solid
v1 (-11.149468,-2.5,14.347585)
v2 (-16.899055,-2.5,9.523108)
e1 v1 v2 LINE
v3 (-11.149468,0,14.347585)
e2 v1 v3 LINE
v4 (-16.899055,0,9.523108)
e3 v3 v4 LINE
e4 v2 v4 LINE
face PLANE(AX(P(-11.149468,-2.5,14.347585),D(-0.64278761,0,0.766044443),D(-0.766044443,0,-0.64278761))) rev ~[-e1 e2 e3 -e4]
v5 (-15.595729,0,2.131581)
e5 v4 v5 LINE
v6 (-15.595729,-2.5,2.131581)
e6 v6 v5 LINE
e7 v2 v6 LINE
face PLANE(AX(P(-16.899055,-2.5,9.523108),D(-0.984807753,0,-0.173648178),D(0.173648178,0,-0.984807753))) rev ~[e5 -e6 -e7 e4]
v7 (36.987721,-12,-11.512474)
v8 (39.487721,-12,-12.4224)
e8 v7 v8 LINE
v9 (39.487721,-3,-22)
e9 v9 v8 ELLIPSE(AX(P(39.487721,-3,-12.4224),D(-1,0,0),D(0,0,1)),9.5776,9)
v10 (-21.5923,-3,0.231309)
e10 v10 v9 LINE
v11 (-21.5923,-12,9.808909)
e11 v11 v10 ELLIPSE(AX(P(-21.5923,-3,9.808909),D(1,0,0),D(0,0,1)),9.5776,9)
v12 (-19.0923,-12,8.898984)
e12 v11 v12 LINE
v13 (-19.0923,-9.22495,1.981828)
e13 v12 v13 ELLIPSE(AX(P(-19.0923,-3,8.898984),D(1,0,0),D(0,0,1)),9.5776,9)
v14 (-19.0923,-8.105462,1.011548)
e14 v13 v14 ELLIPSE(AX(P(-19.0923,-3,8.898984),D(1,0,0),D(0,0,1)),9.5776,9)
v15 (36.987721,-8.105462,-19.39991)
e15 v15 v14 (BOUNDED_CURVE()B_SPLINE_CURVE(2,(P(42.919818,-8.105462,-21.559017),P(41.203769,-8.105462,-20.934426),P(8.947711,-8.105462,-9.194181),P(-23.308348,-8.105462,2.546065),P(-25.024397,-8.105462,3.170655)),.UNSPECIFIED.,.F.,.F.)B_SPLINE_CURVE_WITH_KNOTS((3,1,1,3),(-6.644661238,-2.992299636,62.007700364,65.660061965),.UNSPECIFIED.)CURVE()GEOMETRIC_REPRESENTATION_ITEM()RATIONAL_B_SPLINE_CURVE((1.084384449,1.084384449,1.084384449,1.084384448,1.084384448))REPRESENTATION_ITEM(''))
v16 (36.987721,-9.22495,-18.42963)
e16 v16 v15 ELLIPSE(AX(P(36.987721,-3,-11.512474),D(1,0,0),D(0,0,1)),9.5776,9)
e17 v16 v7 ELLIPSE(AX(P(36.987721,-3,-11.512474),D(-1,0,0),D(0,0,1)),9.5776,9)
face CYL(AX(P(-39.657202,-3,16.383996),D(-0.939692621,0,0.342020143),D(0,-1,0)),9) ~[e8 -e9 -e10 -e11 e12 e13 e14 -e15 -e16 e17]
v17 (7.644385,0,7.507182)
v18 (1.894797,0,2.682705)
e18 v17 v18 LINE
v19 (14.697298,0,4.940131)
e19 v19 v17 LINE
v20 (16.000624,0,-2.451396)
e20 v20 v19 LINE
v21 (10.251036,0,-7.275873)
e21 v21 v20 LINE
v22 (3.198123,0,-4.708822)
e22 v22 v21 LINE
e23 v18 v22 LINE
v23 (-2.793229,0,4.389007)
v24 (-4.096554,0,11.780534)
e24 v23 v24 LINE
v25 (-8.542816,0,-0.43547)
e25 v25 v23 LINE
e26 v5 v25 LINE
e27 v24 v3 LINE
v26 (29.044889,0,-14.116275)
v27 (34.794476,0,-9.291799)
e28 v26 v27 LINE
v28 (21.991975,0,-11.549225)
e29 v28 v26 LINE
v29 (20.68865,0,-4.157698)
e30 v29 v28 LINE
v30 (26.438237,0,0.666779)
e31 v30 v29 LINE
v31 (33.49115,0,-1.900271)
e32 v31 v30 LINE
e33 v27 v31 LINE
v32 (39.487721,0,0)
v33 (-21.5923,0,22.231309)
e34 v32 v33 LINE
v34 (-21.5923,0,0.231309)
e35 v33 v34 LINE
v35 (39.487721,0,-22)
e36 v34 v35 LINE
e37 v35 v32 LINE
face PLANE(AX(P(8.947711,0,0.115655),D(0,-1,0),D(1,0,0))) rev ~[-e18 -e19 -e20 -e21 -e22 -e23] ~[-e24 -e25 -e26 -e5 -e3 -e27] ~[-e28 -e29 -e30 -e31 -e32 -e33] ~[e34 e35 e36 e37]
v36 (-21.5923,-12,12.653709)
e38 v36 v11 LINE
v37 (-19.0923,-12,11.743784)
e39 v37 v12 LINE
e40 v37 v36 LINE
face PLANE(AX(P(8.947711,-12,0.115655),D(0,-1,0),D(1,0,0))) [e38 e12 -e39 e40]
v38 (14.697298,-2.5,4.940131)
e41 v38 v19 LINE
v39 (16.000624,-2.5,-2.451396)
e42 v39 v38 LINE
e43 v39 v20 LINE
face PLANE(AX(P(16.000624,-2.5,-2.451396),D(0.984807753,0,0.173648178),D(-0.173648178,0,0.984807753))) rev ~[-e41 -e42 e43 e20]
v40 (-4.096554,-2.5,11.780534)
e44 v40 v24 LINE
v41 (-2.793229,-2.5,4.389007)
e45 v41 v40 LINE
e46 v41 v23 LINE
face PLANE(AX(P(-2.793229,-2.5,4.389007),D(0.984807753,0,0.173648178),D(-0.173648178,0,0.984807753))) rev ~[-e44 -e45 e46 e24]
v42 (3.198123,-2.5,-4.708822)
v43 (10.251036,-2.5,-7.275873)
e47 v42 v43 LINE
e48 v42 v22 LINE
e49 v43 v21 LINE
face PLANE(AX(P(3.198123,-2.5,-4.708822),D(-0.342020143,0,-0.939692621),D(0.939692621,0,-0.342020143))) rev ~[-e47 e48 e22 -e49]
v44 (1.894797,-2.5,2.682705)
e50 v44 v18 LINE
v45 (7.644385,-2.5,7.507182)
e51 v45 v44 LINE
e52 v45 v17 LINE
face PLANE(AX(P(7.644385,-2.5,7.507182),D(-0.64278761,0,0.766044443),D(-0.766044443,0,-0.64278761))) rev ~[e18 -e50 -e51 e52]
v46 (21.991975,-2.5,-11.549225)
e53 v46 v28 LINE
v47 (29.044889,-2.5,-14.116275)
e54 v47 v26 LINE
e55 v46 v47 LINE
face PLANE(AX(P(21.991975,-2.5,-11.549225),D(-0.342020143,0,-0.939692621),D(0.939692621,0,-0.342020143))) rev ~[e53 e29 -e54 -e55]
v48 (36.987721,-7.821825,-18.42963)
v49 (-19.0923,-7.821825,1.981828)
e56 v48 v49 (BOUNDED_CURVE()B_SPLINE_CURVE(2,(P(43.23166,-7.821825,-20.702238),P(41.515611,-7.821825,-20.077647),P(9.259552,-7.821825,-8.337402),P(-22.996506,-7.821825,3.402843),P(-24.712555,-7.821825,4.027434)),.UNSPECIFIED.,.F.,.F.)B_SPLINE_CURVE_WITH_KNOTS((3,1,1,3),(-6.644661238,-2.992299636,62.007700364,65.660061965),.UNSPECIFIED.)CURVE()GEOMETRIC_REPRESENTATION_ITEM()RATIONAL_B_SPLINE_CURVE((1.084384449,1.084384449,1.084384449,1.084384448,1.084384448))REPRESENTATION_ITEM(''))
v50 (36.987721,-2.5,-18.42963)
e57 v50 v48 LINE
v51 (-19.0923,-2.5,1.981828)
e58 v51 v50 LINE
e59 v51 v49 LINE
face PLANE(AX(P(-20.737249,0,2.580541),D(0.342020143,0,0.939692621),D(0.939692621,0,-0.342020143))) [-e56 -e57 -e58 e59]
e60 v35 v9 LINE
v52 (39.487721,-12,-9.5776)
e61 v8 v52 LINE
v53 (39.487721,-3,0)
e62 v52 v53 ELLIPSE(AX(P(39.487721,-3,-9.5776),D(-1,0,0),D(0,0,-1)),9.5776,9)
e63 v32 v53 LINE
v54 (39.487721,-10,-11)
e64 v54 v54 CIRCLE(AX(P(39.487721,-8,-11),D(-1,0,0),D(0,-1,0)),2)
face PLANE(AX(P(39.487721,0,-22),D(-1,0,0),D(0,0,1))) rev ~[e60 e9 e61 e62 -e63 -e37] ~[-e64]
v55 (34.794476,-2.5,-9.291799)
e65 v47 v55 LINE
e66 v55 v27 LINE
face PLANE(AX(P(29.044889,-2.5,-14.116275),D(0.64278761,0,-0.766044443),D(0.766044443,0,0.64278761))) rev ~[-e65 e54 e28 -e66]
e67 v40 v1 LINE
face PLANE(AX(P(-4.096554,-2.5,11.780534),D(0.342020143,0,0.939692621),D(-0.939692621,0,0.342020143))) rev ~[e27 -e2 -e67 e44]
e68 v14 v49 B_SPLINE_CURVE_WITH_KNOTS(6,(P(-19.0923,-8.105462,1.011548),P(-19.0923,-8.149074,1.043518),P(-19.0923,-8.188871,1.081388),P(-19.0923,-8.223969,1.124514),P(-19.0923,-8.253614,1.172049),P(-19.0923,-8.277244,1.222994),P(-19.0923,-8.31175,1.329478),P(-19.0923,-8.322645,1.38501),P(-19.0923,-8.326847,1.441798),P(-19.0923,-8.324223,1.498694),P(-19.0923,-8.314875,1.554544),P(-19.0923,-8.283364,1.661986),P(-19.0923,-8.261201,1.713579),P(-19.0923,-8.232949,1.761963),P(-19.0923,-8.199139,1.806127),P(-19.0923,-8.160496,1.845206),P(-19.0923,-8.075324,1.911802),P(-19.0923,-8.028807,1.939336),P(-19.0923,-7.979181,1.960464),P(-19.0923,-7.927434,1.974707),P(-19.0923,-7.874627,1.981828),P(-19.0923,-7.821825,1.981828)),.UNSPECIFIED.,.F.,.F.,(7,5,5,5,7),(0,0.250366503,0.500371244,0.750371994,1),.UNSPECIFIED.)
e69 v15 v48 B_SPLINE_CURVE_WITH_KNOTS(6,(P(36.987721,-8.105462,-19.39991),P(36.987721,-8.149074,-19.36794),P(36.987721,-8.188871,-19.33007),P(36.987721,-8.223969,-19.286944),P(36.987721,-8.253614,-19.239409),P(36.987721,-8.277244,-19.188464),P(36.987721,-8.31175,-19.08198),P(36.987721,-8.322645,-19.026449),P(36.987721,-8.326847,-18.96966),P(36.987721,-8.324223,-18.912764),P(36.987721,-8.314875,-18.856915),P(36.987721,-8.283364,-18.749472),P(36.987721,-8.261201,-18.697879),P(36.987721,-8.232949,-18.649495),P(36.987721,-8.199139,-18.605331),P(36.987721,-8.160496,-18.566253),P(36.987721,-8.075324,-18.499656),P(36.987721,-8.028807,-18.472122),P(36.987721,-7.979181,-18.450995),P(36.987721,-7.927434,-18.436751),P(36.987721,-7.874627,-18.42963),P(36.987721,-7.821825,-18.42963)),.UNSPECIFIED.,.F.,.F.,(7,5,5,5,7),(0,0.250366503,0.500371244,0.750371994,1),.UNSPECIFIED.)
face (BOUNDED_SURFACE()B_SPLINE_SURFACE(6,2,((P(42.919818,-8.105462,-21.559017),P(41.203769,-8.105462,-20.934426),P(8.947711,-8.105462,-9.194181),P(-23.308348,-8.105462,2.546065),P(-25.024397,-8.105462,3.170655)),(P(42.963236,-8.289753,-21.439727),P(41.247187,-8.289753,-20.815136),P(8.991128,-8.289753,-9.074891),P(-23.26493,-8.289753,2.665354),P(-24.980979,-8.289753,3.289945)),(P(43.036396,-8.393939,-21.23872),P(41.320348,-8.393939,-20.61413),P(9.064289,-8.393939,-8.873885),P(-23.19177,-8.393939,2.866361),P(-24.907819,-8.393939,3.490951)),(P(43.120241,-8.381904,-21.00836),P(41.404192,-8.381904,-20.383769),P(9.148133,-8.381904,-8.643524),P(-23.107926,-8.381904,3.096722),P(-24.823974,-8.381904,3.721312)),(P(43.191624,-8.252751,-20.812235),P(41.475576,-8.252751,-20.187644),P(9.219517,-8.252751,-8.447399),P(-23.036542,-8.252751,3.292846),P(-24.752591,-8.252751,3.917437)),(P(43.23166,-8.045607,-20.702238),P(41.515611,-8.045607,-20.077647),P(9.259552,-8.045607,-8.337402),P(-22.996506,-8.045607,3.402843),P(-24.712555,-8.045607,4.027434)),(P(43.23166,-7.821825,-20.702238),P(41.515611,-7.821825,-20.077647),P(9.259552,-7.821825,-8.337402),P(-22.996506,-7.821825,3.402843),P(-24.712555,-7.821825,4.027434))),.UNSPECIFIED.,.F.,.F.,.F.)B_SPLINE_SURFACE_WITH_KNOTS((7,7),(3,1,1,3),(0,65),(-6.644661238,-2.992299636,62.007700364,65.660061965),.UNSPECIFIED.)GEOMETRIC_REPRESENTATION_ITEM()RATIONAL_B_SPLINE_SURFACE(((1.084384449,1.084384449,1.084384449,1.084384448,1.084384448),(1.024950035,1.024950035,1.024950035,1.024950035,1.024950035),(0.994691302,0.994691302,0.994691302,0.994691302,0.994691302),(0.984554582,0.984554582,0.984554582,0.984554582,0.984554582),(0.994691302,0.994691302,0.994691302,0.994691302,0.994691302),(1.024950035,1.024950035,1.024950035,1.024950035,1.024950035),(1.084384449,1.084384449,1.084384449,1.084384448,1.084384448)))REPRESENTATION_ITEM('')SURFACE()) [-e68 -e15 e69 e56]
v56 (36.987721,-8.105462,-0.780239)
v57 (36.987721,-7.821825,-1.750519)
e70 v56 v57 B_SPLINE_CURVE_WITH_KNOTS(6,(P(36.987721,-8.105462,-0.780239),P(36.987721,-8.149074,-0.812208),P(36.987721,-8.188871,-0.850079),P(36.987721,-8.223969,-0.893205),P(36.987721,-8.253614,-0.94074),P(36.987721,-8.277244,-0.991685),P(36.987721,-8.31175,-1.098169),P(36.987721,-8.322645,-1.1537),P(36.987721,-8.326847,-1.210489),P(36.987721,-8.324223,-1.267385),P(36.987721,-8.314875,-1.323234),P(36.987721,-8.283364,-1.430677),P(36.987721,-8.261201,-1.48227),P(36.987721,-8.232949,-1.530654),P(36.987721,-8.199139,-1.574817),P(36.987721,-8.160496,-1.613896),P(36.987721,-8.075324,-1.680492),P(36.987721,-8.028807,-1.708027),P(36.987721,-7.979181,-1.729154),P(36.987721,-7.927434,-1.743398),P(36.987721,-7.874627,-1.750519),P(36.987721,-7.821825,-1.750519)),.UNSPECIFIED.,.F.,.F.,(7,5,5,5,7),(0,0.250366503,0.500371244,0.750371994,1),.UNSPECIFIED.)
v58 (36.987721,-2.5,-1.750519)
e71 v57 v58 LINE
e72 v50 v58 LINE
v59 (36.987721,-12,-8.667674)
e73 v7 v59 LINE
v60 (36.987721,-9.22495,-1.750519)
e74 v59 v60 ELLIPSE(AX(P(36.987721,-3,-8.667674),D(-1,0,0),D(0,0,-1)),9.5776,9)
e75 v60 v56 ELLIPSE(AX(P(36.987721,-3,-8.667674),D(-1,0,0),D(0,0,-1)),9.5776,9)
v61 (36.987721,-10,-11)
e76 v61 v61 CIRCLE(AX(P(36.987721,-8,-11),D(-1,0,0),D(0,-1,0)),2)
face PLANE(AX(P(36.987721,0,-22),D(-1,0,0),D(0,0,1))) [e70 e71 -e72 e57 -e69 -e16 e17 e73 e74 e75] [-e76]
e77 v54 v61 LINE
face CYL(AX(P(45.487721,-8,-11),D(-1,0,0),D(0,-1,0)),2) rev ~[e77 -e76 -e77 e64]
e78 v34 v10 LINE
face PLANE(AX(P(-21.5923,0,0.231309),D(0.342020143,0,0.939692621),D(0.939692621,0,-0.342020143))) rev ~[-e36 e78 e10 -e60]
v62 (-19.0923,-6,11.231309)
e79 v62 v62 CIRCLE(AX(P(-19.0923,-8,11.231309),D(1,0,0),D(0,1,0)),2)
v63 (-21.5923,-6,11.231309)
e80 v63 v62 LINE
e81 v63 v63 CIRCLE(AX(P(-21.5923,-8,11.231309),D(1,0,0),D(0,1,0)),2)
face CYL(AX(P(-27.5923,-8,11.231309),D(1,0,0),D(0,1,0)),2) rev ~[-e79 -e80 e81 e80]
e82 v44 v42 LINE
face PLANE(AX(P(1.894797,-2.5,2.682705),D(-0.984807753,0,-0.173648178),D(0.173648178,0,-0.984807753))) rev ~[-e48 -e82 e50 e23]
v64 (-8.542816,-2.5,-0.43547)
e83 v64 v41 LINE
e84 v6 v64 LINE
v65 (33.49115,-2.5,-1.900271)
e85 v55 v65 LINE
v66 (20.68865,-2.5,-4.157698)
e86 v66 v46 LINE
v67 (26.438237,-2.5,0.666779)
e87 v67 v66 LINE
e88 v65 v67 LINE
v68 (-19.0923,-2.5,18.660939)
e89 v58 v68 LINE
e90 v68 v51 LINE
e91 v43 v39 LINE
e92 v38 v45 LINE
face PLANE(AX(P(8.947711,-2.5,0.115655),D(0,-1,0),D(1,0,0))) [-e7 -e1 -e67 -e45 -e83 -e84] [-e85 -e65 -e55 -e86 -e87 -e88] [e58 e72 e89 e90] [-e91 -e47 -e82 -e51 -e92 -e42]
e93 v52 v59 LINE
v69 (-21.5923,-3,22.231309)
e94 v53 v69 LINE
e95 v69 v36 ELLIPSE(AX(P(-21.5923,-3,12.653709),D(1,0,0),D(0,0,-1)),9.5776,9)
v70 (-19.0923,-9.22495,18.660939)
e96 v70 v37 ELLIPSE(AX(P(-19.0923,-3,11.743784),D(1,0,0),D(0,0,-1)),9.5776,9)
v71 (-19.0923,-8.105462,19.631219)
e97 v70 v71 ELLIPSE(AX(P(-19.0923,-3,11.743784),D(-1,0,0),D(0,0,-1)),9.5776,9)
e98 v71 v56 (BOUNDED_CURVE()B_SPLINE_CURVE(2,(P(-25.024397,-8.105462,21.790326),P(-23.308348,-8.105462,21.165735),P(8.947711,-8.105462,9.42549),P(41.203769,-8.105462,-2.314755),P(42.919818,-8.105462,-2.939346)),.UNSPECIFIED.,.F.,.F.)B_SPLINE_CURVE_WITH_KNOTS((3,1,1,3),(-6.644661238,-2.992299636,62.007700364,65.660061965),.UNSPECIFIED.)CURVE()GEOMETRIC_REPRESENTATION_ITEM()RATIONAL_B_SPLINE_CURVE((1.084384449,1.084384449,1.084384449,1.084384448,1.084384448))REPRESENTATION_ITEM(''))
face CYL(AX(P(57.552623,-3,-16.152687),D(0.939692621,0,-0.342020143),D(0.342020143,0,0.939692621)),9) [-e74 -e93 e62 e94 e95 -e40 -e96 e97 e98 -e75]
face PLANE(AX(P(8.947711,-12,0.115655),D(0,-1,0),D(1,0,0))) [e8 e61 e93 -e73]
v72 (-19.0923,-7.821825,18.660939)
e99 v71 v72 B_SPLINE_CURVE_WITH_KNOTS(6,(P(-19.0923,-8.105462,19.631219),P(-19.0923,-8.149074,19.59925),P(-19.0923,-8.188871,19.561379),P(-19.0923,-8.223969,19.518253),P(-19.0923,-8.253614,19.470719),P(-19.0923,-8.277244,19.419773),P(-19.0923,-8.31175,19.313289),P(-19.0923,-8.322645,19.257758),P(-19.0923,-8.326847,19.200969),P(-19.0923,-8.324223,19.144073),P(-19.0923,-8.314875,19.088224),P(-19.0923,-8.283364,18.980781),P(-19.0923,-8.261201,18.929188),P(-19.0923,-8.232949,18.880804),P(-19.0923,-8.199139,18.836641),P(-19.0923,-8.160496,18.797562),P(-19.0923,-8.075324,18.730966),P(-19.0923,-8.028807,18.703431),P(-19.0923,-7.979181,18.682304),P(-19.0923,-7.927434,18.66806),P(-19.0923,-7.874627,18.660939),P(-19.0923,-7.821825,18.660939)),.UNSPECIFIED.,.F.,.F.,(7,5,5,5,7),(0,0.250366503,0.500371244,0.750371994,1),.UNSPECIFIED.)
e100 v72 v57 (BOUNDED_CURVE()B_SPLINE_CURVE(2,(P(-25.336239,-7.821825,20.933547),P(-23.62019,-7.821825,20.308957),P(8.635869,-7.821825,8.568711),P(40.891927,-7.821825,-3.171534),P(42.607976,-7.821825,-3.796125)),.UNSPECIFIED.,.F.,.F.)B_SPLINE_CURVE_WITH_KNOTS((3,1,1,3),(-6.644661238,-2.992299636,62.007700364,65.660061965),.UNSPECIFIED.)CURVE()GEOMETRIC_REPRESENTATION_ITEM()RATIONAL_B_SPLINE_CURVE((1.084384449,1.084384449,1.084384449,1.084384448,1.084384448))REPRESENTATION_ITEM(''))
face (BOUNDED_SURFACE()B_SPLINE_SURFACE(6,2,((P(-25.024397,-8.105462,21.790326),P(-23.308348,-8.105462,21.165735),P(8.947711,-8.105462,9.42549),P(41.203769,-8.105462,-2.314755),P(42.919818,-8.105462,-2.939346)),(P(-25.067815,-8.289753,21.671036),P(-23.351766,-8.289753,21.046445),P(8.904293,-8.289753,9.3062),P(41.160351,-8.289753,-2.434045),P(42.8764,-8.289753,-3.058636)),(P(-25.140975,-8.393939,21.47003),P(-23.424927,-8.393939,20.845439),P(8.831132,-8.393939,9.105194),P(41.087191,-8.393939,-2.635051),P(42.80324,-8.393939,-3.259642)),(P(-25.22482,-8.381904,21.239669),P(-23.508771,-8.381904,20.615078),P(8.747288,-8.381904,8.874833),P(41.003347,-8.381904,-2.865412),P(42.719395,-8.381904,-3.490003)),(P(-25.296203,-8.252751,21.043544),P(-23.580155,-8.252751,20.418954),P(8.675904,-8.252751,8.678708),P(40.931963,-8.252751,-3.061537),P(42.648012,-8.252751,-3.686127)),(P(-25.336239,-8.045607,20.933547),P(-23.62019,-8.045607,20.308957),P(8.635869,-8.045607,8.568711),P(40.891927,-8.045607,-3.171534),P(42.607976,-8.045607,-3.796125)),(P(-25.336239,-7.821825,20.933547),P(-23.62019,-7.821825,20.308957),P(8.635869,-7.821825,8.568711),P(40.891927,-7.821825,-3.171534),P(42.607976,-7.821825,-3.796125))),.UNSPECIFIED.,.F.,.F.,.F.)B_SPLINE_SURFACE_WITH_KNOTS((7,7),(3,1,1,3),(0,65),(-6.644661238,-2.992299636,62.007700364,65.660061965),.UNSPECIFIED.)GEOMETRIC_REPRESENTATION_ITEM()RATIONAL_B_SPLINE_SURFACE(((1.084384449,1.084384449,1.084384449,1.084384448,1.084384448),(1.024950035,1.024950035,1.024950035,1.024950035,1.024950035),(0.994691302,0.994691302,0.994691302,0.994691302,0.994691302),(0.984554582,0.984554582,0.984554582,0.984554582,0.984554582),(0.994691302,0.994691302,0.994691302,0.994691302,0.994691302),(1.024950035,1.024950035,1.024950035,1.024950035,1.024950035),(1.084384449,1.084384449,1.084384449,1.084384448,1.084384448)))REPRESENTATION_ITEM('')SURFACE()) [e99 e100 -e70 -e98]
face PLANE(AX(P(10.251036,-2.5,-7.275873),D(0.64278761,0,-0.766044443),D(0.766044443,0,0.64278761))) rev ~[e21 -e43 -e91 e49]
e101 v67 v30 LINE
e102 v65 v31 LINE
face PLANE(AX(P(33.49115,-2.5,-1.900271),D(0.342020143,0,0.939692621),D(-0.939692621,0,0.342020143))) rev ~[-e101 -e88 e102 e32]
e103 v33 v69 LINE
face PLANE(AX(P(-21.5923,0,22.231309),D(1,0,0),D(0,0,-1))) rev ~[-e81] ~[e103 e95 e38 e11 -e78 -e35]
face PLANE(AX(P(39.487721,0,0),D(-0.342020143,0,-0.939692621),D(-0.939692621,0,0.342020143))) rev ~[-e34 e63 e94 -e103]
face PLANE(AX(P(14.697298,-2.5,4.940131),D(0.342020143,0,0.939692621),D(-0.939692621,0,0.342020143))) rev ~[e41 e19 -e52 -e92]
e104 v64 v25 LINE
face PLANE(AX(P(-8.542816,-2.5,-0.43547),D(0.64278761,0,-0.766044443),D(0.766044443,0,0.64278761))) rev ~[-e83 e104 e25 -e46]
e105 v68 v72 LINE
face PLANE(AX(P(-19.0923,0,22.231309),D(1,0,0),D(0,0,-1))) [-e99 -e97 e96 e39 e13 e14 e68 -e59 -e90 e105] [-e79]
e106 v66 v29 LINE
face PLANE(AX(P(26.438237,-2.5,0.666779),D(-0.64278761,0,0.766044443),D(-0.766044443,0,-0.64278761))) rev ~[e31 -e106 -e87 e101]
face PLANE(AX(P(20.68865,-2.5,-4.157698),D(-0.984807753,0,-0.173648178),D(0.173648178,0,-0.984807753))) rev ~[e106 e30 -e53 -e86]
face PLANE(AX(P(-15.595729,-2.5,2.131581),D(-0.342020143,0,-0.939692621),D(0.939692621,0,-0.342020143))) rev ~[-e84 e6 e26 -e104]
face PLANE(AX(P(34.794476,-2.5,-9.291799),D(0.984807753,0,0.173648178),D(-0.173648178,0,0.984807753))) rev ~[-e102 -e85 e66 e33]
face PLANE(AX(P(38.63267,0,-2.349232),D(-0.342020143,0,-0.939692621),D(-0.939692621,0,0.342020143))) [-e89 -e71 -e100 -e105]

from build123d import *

# Parameters (mm, degrees)
F1_DEPTH    = 12
F2_T        = -2.5
F4_D        = 4
F4_DEPTH    = 6
F4_TIP      = 1.2017212381
F6_D        = 4
F6_DEPTH    = 6
F6_TIP      = 1.2017212381
F7_T1_DEPTH = 110
F7_T3_DEPTH = 110
F9_DEPTH    = 25
F10_R       = 0.5


# Not quite as in the source:
# - a fillet or chamfer that OpenCascade refuses, or shapes differently, is made with other operations: its cross-section is extruded or revolved along the edge and cut away or added


with BuildPart() as f1:
    # F0 (on Front) → F1 (new body)
    with BuildSketch(Plane.XZ):
        Polygon((39.4877206884, 0), (-21.5922996627, 22.2313093162), (-21.5922996627, 0.2313093162), (39.4877206884, -22), align=None)
    extrude(amount=F1_DEPTH)

    # F2
    f2_openings = [f1.faces().sort_by_distance(p)[0] for p in [
        (8.947711, -12, 0.115655),
    ]]
    offset(amount=F2_T, openings=f2_openings)

    # F4
    with Locations(Plane(origin=(-21.5922996627, 0, 0), x_dir=(0, -1, 0), z_dir=(-1, 0, 0))):
        with Locations((8, 11.2313093162)):
            Hole(F4_D / 2, depth=F4_DEPTH)
            with Locations((0, 0, -(F4_DEPTH + F4_TIP / 2))):  # 118° drill point
                Cone(0, F4_D / 2, F4_TIP, mode=Mode.SUBTRACT)

    # F6
    with Locations(Plane.YZ.offset(39.4877206884)):
        with Locations((-8, -11)):
            Hole(F6_D / 2, depth=F6_DEPTH)
            with Locations((0, 0, -(F6_DEPTH + F6_TIP / 2))):  # 118° drill point
                Cone(0, F6_D / 2, F6_TIP, mode=Mode.SUBTRACT)

    # F7: fillet of radius 9 on 2 edges, made by hand

    # F7_s2 → F7_t1 (cut)
    with BuildSketch(Plane(origin=(56.0116188142, 0, -20.3865620214), x_dir=(0, 1, 0), z_dir=(-0.9396926208, 0, 0.3420201433))):
        with BuildLine():
            ThreePointArc((-3, -13.5055958894), (-9.3639610307, -10.8695569201), (-12, -4.5055958894))
            Line((-12, -4.5055958894), (-12, -13.5055958894))
            Line((-12, -13.5055958894), (-3, -13.5055958894))
        make_face()
    extrude(amount=F7_T1_DEPTH, mode=Mode.SUBTRACT)

    # F7_s4 → F7_t3 (cut)
    with BuildSketch(Plane(origin=(-40.2839057657, 0, 14.6621426187), x_dir=(0, 1, 0), z_dir=(0.9396926208, 0, -0.3420201433))):
        with BuildLine():
            ThreePointArc((-12, 1.8323582321), (-9.3639610307, -4.5316027985), (-3, -7.1676417679))
            Line((-3, -7.1676417679), (-12, -7.1676417679))
            Line((-12, -7.1676417679), (-12, 1.8323582321))
        make_face()
    extrude(amount=F7_T3_DEPTH, mode=Mode.SUBTRACT)

    # F8 (on face) → F9 (cut)
    with BuildSketch(Plane.XZ.offset(2.5)):
        Polygon((-8.5428162153, -0.4354697523), (-2.7932286645, 4.389007041), (-4.0965543521, 11.7805343179), (-11.1494675905, 14.3475848015), (-16.8990551413, 9.5231080082), (-15.5957294537, 2.1315807313), align=None)
        Polygon((10.2510362004, -7.2758726188), (16.0006237512, -2.4513958255), (14.6972980636, 4.9401314514), (7.6443848253, 7.507181935), (1.8947972745, 2.6827051417), (3.198122962, -4.7088221352), align=None)
        Polygon((29.0448886161, -14.1162754854), (34.7944761669, -9.2917986921), (33.4911504793, -1.9002714151), (26.438237241, 0.6667790685), (20.6886496902, -4.1576977248), (21.9919753777, -11.5492250017), align=None)
    extrude(amount=-F9_DEPTH, mode=Mode.SUBTRACT)

    # F10
    f10_edges = [f1.edges().sort_by_distance(p)[0] for p in [
        (8.947711, -9.22495, -8.223901),
        (8.947711, -9.22495, 8.45521),
    ]]
    fillet(f10_edges, radius=F10_R)


solid = f1.part
